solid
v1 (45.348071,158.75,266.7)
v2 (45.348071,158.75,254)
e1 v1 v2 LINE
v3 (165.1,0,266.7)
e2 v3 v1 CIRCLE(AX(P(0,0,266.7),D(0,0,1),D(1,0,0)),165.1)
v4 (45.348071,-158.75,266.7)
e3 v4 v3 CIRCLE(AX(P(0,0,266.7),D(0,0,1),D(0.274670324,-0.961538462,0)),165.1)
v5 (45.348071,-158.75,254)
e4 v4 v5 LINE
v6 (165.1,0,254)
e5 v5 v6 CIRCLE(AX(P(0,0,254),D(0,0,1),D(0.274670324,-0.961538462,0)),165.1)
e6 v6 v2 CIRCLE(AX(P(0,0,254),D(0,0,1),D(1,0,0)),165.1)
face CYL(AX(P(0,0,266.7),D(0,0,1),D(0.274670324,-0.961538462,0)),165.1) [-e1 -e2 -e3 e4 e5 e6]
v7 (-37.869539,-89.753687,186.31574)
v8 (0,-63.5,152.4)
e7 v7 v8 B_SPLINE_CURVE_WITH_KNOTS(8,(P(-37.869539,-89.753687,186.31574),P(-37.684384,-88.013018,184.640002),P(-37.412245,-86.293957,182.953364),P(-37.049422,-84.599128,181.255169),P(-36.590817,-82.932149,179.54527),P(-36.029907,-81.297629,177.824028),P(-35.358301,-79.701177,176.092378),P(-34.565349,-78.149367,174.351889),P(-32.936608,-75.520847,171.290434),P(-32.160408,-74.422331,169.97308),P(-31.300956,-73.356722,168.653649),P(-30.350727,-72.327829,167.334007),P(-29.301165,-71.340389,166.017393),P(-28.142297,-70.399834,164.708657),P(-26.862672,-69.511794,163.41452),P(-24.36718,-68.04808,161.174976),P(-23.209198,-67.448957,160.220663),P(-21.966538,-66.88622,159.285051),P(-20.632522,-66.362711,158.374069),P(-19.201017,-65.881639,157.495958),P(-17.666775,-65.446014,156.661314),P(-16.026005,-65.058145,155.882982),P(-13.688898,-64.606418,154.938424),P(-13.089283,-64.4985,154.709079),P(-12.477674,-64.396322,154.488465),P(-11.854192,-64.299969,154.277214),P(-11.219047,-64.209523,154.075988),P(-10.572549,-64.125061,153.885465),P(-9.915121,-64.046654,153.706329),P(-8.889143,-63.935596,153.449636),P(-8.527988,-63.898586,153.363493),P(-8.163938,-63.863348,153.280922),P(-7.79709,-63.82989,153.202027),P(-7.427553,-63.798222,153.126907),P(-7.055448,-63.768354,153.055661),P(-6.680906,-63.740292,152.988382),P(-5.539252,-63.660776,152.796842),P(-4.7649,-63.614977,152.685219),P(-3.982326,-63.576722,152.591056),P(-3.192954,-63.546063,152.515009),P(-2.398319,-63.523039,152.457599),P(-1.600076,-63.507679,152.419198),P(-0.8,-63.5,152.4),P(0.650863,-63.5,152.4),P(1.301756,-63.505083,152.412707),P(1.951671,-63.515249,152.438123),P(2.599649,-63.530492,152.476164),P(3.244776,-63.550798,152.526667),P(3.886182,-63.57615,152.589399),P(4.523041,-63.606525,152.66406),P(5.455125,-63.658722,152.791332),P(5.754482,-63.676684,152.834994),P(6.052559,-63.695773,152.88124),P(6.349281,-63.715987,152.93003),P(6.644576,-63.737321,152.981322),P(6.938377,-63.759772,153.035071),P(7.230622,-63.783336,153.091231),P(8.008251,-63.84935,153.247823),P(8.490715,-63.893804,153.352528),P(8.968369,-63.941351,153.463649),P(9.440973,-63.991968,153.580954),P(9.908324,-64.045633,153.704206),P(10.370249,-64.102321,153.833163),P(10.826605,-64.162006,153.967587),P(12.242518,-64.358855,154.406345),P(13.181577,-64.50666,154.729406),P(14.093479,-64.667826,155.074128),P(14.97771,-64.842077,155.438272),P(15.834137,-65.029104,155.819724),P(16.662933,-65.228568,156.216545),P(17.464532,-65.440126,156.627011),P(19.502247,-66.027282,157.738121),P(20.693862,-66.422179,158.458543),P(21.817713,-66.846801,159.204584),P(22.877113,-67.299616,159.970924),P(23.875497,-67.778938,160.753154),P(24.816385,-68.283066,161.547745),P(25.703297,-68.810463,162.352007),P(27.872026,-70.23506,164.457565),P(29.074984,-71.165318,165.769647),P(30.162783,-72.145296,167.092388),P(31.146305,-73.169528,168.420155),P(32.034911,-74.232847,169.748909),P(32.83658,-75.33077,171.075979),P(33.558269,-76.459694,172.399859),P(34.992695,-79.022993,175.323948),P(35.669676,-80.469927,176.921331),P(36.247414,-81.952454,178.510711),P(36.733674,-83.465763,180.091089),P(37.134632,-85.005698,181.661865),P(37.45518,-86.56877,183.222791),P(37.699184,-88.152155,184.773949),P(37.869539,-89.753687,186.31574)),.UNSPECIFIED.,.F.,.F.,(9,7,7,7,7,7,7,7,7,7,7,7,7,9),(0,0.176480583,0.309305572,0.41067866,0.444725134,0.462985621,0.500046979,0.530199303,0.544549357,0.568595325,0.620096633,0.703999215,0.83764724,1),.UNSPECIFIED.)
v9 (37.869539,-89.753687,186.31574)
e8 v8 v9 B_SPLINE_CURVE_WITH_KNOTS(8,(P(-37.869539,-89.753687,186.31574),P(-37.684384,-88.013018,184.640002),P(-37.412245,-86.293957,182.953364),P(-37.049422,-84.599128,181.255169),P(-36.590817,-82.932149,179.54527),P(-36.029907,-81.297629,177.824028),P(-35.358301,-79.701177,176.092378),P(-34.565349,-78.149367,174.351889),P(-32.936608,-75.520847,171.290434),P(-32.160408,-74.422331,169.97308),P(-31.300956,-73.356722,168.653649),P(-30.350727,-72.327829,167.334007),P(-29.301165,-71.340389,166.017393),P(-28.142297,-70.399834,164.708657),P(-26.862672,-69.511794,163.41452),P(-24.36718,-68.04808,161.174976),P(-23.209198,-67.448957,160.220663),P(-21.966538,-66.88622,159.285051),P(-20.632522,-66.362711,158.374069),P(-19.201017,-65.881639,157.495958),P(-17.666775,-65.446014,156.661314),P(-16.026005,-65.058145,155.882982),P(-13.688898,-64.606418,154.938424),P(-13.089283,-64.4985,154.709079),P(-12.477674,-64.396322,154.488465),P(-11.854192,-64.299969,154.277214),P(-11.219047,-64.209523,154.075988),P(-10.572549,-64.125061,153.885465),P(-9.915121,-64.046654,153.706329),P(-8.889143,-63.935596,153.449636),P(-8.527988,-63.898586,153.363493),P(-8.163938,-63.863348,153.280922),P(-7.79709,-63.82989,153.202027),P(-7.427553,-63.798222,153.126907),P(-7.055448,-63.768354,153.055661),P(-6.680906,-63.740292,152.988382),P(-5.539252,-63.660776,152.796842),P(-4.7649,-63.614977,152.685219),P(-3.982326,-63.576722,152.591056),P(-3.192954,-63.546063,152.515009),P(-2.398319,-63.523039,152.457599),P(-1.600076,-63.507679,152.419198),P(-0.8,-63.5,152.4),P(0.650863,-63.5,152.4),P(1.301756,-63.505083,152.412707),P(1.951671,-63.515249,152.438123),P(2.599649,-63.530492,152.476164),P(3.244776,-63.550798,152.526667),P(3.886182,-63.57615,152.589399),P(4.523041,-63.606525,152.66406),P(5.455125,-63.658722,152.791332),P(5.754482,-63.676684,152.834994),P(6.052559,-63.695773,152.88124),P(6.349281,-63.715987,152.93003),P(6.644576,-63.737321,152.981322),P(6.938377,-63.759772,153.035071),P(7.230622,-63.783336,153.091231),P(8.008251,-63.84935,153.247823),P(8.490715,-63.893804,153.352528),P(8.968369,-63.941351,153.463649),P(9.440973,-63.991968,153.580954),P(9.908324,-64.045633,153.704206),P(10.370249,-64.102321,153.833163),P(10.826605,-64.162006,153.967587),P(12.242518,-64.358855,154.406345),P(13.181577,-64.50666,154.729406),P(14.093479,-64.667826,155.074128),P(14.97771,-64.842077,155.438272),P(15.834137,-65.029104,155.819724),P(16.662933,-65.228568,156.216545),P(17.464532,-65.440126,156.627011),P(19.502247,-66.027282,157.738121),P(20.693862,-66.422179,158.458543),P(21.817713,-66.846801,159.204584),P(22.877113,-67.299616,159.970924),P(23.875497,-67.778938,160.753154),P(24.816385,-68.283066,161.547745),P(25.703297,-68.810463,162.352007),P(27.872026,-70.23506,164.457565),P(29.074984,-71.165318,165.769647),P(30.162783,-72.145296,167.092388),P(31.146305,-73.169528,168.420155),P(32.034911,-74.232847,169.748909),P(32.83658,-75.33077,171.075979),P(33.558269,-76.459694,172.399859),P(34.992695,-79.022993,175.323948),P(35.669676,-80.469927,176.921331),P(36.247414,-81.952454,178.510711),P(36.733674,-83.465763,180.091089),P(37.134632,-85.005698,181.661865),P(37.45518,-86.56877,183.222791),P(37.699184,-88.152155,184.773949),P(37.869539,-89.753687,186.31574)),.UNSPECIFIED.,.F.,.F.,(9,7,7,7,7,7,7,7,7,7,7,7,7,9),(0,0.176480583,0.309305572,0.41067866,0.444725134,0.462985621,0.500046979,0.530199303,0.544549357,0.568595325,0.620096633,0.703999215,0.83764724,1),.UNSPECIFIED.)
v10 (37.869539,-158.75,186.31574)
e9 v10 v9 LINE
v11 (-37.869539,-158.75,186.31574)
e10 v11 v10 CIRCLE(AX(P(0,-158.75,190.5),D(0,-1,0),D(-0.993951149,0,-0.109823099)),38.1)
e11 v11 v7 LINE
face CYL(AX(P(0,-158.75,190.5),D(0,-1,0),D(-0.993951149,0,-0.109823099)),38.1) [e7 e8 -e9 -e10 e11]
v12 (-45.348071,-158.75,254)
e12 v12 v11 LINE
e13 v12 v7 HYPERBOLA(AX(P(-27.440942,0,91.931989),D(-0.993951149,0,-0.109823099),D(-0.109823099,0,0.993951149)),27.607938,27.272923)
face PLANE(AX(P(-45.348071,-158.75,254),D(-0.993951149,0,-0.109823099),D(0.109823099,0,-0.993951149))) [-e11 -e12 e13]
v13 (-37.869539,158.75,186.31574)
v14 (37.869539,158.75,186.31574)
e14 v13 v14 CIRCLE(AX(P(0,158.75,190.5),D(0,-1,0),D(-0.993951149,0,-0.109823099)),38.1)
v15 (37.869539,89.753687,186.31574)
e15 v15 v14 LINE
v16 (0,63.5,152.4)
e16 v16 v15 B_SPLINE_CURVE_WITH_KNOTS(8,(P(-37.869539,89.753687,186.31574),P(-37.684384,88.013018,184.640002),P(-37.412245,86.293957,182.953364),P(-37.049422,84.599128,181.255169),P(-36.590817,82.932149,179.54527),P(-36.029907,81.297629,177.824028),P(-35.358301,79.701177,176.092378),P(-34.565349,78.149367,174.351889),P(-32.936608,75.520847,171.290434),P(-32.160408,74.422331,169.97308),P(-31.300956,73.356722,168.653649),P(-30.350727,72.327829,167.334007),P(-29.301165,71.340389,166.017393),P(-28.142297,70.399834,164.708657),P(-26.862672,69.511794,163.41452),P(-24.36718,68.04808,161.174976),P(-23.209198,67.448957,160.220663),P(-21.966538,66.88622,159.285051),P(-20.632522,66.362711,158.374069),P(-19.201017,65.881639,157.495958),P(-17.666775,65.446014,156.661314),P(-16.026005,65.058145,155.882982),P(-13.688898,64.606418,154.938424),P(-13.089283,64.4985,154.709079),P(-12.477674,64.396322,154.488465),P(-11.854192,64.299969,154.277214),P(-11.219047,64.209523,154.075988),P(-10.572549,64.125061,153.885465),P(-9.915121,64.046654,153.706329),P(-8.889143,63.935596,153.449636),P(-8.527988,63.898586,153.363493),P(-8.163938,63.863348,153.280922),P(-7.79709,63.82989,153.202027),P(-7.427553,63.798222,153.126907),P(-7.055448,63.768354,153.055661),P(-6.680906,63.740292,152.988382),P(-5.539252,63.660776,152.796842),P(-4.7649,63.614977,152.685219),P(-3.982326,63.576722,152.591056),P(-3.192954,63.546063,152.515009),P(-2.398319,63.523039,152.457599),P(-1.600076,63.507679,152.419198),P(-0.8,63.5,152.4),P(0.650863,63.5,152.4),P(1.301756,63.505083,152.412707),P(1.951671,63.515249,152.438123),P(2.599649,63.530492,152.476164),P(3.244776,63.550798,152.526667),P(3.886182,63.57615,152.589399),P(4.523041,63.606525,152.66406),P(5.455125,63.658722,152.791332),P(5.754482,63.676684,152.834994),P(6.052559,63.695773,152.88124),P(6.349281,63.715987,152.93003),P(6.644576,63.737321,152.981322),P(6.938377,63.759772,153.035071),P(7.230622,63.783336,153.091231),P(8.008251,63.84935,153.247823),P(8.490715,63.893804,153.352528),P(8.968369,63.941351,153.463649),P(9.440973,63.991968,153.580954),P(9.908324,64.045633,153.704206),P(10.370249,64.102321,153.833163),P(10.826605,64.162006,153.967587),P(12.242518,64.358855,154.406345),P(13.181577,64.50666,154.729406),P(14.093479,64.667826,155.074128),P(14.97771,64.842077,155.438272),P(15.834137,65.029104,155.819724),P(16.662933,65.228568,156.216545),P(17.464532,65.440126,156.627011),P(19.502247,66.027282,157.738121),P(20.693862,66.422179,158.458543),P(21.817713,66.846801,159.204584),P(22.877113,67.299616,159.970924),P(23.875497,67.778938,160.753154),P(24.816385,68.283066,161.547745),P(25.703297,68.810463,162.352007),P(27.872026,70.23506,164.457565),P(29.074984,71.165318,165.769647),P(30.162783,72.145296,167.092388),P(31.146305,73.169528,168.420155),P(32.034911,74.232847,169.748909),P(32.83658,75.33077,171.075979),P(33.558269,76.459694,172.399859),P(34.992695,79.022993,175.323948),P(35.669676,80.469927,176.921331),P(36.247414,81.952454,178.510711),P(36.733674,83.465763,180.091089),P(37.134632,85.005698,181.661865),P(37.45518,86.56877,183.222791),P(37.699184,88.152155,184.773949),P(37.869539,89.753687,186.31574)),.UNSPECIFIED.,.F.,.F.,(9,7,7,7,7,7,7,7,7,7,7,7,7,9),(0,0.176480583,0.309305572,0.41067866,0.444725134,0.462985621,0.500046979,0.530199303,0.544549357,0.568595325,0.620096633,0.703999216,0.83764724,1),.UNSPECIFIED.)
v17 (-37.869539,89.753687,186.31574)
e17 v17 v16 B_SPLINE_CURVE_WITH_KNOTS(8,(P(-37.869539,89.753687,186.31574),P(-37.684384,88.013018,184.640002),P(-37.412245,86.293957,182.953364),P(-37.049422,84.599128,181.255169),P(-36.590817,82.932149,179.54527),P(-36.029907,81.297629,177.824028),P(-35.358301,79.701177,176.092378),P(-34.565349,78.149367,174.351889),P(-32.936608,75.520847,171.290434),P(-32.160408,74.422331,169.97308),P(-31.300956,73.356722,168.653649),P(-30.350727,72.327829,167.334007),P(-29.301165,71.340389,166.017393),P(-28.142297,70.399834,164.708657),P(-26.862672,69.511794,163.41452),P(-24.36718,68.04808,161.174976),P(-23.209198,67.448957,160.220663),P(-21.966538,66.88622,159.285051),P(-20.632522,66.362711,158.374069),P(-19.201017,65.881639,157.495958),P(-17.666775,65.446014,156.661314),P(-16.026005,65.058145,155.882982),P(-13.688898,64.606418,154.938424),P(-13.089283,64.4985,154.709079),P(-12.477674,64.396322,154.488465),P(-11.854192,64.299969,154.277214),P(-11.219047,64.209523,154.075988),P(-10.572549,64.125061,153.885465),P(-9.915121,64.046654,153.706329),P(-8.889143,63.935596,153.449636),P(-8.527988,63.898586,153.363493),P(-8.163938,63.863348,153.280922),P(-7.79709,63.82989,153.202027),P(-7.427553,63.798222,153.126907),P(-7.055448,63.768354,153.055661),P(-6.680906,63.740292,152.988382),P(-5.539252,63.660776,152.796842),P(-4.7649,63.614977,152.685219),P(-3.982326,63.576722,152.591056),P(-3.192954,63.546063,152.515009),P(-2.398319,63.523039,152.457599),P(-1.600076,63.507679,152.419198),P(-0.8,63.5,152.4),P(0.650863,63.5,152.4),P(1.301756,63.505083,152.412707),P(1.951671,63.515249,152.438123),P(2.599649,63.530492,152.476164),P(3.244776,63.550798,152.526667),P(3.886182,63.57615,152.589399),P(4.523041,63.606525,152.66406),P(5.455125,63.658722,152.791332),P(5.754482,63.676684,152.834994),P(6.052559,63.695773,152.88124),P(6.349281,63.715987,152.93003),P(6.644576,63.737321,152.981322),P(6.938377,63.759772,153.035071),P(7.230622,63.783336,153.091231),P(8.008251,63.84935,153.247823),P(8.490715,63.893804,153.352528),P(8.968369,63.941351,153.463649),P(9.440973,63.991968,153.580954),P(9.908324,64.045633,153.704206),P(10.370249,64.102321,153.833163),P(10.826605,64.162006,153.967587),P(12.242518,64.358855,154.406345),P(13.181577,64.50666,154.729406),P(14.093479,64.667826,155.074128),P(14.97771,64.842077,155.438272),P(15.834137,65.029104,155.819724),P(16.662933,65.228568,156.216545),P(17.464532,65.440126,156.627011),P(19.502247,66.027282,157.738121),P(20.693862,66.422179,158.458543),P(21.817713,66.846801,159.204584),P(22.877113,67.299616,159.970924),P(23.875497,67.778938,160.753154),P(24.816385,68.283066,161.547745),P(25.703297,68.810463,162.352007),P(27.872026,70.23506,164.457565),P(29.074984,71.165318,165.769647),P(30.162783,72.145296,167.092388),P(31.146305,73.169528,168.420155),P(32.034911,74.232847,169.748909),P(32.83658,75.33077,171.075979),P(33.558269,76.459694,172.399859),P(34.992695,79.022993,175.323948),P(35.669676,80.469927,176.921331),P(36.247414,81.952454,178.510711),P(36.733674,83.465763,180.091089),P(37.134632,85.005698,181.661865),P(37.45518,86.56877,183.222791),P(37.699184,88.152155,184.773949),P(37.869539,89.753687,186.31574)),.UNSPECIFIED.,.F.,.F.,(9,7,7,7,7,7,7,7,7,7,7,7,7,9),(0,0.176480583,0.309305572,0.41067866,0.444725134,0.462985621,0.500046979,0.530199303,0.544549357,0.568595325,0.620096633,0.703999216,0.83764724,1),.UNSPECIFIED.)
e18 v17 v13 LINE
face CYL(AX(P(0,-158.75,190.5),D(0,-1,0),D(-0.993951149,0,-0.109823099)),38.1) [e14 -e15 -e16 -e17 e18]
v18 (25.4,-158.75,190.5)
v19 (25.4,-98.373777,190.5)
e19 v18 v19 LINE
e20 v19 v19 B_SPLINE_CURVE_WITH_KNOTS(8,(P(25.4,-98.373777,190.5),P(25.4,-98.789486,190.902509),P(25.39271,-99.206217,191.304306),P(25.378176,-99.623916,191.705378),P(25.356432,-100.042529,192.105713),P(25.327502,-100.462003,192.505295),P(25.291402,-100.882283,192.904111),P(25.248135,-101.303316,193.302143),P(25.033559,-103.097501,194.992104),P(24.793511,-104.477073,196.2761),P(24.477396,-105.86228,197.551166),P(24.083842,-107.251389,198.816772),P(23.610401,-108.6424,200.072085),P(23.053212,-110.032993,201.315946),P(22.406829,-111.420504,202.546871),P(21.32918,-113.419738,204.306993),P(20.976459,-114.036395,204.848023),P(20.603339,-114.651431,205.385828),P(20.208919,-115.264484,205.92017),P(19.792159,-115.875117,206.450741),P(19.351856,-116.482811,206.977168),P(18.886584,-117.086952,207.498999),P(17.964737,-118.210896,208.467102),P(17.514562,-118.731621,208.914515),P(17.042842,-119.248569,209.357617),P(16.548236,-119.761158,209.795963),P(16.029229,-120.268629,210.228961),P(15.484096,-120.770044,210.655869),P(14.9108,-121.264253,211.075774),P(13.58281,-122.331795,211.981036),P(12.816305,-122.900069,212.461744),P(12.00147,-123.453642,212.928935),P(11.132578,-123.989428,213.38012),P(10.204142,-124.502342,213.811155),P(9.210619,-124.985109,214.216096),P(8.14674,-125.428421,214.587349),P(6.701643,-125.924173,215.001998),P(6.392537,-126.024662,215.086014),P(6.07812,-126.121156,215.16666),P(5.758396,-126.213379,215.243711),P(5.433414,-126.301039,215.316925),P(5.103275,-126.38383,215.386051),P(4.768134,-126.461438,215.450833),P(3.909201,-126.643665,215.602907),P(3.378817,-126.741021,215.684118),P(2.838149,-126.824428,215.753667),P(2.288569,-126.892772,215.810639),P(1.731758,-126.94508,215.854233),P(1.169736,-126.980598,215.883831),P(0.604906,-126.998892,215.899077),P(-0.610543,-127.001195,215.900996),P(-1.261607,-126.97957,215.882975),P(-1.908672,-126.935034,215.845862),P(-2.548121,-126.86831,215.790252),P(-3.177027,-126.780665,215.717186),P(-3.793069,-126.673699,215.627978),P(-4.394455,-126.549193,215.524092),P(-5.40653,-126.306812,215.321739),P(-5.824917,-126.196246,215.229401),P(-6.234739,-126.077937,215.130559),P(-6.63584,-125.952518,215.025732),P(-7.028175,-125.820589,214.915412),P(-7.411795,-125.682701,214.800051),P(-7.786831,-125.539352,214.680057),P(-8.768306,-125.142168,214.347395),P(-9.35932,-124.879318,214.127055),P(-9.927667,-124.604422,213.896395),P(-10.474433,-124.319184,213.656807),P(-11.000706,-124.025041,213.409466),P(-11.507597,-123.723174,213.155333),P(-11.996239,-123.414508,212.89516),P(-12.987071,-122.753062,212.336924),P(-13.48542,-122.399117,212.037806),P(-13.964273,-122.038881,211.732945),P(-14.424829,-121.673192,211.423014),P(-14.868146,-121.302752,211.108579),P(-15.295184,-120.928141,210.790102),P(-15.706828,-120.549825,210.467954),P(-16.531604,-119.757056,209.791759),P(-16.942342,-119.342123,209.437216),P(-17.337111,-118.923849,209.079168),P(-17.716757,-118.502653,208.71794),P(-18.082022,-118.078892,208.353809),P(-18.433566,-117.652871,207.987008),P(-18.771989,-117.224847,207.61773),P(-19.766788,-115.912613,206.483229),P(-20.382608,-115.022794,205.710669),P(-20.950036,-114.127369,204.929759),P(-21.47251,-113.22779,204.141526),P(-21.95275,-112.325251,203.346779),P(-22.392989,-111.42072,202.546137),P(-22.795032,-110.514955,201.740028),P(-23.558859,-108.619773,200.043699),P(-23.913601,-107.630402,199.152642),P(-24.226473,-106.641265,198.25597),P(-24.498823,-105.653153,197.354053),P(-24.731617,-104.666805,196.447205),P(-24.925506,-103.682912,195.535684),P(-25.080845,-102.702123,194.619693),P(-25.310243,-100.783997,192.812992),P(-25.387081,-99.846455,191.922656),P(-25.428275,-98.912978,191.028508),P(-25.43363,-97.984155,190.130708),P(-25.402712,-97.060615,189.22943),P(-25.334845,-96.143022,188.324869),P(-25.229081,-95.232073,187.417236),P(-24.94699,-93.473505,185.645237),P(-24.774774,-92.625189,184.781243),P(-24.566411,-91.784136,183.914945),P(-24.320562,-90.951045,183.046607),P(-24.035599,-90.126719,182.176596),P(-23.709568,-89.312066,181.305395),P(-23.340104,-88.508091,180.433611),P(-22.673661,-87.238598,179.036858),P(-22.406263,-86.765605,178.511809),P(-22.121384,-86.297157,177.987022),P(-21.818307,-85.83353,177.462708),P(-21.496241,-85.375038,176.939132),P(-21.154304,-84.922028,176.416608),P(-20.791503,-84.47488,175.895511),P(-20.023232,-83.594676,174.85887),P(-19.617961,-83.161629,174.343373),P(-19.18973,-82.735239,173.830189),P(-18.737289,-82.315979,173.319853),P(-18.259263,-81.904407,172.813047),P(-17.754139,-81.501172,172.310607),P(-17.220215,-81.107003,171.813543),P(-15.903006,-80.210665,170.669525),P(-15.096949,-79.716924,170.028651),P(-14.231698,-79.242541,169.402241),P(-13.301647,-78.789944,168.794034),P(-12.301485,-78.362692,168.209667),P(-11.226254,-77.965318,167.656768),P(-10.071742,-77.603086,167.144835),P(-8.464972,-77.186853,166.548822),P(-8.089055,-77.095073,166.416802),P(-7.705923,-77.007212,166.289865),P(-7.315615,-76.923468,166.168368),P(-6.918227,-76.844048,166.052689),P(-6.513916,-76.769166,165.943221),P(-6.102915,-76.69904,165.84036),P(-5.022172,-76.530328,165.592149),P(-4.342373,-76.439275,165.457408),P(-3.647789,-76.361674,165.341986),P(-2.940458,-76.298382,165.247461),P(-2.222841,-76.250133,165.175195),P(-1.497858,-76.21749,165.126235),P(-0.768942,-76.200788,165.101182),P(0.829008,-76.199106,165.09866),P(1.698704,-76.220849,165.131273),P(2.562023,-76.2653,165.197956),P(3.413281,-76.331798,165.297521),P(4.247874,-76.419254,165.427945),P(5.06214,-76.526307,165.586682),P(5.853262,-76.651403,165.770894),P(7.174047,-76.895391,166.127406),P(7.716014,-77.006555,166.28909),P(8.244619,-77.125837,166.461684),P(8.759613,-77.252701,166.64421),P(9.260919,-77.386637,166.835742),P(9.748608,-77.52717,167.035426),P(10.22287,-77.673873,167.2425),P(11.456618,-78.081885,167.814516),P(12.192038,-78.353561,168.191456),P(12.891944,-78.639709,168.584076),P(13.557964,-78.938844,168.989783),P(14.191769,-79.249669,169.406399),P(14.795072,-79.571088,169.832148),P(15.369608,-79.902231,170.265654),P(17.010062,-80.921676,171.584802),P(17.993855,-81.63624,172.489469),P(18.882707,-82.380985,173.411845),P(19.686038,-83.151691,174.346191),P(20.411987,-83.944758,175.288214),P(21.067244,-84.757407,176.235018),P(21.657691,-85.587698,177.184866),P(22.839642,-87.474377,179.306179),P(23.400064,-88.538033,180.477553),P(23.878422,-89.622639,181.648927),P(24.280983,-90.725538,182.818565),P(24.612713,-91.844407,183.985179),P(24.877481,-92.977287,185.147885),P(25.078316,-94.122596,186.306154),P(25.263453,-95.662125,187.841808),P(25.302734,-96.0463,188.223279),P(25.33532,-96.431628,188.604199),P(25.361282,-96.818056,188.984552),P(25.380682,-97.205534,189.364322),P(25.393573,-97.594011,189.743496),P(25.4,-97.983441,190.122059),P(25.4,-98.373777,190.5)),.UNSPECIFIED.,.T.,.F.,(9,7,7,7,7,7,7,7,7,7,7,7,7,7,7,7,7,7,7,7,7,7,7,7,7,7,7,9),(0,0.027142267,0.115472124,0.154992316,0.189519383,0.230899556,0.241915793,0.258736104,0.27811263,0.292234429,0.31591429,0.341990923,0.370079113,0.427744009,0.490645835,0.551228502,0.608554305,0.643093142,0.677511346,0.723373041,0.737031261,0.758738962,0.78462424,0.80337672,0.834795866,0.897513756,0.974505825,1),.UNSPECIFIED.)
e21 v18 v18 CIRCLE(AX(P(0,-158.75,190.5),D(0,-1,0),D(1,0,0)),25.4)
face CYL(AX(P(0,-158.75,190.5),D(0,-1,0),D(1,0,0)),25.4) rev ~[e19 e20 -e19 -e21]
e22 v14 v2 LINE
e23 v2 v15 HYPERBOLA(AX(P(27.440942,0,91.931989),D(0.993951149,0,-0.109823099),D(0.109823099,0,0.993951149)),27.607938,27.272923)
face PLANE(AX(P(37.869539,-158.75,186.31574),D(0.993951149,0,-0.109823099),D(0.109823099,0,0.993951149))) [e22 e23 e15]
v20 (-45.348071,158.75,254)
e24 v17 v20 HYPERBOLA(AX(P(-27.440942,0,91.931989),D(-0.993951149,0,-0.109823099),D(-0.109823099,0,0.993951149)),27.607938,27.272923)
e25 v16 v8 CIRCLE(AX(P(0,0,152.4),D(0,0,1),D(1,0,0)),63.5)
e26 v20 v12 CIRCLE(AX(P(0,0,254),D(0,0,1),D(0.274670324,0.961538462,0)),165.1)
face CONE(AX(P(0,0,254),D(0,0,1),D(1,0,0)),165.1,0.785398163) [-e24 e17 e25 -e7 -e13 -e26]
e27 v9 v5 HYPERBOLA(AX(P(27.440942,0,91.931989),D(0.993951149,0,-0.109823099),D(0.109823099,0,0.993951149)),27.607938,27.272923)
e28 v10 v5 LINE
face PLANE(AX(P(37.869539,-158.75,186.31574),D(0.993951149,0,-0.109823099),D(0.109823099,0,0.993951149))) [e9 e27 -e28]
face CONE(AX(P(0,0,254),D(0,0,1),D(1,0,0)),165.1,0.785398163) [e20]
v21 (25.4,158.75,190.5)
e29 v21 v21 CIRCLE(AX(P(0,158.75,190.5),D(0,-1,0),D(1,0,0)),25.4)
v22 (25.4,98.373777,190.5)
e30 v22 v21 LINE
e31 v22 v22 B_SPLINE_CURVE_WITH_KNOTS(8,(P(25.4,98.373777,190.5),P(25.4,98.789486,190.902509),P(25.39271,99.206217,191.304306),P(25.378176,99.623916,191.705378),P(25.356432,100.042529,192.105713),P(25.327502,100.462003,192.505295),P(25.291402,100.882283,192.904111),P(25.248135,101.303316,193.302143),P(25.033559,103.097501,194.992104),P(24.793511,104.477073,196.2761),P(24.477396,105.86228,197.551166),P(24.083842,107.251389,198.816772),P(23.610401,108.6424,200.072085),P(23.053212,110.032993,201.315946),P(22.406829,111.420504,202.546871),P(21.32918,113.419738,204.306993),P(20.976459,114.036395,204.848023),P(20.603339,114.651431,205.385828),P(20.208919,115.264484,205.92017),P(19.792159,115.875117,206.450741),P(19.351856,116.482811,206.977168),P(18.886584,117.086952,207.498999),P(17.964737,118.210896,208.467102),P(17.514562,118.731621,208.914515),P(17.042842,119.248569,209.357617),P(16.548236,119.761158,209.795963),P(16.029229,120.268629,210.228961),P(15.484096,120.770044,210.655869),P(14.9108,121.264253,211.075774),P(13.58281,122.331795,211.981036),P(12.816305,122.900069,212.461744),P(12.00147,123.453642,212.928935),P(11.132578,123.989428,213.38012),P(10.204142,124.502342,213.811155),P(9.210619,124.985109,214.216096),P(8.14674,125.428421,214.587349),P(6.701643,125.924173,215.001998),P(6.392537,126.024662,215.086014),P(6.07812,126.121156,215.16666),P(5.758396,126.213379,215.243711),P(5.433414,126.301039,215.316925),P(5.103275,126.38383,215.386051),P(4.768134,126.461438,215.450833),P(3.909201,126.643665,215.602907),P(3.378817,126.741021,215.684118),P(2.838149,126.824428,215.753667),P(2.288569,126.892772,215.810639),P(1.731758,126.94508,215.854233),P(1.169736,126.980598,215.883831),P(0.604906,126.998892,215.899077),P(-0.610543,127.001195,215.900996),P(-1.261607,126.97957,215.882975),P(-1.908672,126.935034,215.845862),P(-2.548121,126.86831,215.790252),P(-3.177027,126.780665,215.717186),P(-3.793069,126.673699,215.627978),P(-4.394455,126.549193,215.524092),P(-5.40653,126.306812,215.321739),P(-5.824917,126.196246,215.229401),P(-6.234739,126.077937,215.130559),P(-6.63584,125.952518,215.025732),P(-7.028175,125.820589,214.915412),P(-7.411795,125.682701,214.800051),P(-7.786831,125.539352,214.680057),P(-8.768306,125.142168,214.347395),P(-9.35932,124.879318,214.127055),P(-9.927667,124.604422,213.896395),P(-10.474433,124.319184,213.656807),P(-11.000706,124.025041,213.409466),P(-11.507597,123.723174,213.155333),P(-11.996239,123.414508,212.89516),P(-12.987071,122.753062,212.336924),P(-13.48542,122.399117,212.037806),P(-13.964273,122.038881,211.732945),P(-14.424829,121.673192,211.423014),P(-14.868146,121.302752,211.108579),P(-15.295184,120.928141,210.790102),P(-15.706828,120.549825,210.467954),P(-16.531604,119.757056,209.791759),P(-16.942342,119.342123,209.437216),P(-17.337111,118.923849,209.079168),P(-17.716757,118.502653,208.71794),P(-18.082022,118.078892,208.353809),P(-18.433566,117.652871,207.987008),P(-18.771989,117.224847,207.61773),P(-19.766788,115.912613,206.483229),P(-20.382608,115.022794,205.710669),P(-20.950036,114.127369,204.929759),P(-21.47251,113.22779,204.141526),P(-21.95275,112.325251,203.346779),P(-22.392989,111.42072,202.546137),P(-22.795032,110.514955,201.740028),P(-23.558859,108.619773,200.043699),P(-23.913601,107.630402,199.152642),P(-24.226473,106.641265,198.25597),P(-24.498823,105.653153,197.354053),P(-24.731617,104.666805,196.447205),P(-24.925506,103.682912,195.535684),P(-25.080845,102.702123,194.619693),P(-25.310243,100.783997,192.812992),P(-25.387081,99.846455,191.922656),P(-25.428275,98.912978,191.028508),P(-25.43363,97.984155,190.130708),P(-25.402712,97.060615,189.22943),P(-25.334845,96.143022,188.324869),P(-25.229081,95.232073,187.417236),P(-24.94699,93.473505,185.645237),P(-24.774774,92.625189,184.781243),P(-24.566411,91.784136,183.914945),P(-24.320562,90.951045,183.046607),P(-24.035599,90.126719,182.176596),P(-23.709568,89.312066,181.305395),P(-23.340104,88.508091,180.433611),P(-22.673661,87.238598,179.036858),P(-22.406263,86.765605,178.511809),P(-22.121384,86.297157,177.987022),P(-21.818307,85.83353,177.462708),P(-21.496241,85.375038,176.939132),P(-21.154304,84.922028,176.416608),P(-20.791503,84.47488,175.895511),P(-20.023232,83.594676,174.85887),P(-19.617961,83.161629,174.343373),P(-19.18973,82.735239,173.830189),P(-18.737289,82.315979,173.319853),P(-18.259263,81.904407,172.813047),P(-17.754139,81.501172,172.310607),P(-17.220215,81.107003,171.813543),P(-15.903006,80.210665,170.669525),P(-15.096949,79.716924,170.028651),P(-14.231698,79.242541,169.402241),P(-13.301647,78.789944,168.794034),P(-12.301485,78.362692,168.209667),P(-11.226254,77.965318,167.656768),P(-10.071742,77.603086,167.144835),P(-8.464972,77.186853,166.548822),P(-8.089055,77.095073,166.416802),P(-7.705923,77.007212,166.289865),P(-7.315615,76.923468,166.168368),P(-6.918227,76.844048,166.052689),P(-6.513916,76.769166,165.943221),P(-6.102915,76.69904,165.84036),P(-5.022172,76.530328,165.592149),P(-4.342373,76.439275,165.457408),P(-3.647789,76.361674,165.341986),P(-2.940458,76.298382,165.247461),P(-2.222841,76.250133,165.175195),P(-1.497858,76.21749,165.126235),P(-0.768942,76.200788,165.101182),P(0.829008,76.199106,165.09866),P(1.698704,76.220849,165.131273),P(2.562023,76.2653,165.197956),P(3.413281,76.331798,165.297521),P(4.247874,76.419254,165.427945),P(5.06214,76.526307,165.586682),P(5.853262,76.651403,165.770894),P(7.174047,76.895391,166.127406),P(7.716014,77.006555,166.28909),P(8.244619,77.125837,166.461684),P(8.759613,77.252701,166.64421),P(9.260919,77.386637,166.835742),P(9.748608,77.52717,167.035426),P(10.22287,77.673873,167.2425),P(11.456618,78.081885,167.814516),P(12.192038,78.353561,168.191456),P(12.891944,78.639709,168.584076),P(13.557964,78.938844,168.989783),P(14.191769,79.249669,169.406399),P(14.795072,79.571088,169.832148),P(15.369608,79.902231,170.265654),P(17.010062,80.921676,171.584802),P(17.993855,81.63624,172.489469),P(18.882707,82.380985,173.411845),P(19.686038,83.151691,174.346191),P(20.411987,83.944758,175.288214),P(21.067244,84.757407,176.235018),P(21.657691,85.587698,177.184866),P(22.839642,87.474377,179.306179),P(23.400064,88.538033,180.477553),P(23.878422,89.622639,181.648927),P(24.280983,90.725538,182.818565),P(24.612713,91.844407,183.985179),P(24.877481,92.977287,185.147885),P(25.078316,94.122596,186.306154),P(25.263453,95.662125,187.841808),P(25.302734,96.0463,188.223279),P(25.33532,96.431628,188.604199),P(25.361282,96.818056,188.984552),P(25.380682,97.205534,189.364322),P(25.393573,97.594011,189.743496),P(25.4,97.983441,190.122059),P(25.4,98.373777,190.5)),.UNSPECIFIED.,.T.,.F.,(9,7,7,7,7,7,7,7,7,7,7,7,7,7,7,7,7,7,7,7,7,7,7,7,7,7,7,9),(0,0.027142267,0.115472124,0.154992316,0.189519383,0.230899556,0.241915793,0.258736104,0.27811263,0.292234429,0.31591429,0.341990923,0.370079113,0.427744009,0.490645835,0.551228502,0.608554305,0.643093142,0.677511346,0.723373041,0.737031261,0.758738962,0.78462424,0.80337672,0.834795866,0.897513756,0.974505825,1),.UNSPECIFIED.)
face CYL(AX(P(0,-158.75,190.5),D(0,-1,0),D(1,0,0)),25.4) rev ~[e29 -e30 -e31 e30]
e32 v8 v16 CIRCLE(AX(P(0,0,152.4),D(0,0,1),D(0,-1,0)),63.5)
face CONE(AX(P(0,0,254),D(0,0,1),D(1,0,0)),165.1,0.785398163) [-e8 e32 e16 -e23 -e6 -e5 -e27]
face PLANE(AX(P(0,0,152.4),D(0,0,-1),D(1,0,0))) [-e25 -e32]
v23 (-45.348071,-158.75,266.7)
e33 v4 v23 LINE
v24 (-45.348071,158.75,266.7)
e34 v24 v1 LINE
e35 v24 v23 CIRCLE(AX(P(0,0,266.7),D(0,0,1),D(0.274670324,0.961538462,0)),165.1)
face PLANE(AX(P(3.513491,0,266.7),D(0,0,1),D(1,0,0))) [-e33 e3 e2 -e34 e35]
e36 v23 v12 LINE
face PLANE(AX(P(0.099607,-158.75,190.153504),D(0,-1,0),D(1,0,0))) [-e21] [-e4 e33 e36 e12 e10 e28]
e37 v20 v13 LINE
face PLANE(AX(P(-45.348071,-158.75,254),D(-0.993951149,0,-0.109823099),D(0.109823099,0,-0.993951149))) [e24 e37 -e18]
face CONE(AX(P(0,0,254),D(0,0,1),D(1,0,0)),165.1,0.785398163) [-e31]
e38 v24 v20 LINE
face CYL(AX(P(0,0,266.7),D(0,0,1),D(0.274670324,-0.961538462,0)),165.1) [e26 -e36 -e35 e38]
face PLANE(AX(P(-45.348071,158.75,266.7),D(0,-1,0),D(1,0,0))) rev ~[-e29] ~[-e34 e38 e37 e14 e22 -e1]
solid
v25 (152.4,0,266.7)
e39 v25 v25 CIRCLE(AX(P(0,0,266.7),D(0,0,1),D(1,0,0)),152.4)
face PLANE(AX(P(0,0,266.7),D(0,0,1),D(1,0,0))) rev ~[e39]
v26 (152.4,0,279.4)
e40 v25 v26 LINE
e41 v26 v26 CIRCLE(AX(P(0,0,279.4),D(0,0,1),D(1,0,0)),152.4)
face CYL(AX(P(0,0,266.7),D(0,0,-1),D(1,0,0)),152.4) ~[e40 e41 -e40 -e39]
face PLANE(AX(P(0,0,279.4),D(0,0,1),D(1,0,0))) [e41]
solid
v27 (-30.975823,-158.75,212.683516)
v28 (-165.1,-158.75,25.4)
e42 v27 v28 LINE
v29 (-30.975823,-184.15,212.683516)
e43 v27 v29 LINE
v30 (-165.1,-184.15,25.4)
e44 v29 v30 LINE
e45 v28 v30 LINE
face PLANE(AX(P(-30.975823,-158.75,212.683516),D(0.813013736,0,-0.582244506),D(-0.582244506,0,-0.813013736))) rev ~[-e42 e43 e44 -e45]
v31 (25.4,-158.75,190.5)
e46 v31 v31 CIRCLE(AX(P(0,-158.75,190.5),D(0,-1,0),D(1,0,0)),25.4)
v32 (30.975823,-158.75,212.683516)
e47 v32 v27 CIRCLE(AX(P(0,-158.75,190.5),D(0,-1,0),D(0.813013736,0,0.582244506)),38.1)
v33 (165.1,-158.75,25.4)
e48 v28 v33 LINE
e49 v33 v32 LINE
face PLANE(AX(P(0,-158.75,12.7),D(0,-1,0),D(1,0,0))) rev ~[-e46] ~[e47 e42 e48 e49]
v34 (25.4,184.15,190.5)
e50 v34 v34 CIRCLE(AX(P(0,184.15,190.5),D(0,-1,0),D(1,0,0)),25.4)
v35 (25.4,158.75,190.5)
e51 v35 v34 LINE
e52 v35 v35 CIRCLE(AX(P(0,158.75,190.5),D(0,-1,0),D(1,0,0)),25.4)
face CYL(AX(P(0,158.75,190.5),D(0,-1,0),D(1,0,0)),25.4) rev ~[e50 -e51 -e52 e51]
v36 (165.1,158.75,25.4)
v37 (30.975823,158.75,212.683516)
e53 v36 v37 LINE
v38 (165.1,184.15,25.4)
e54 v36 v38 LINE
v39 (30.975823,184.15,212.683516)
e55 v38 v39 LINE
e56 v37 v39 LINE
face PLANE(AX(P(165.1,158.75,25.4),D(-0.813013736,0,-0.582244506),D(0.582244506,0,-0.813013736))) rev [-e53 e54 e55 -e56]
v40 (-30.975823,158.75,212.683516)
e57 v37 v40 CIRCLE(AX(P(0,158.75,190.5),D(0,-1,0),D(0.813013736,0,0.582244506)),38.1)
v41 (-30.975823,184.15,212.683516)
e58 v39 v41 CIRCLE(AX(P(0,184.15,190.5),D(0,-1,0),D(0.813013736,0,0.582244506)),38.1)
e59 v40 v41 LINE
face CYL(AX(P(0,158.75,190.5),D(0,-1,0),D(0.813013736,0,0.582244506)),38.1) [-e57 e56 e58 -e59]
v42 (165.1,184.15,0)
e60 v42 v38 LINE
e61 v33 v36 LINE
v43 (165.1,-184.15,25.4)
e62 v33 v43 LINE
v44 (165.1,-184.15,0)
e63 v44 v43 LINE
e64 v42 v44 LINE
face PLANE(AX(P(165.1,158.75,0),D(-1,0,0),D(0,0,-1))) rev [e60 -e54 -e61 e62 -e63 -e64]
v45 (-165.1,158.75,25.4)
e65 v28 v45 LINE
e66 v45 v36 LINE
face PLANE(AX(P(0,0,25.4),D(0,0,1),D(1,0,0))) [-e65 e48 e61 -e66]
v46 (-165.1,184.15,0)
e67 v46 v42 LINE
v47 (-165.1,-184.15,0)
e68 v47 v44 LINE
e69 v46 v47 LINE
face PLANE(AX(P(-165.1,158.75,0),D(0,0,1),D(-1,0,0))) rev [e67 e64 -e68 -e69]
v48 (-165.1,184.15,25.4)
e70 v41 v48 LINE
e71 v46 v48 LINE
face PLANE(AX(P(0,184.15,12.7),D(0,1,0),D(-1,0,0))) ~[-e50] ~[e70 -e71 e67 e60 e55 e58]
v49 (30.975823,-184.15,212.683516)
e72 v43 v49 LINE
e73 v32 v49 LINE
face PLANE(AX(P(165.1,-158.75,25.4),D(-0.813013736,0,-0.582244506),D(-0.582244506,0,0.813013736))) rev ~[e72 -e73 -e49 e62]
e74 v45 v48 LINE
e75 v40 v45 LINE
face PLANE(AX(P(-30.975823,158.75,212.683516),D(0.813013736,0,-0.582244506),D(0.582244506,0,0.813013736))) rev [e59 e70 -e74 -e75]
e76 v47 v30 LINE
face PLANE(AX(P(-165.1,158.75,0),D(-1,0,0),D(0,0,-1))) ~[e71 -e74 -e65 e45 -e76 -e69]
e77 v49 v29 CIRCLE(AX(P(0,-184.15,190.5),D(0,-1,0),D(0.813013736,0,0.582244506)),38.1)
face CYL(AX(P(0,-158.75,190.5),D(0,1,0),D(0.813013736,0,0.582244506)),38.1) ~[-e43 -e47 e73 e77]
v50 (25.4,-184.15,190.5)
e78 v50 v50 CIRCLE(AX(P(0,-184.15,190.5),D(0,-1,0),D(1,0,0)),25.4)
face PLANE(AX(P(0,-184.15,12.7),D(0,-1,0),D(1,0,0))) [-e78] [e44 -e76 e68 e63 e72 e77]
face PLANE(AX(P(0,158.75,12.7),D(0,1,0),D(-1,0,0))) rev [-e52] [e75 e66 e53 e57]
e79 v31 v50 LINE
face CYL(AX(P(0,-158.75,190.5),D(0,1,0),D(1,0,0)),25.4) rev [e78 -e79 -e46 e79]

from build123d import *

# Parameters (mm, degrees)
F0_W      = 330.2
F0_H      = 317.5
F1_DEPTH  = 25.4
F2_W      = 330.2
F2_H      = 25.4
F2_R      = 25.4
F3_DEPTH  = 25.4
F7_DEPTH  = 12.7
F7_FACE_R = 165.1
F8_DEPTH  = 101.6
F8_TAPER  = 45
F9_DEPTH  = 266.701
F10_R     = 25.4
F11_DEPTH = 317.5
F12_R     = 152.4
F13_DEPTH = 12.7


with BuildPart() as f1:
    # F0 (on Top) → F1 (new body)
    with BuildSketch(Plane.XY):
        Rectangle(F0_W, F0_H)
    extrude(amount=F1_DEPTH)

    # F2 (on face) → F3 (join)
    with BuildSketch(Plane.XZ.offset(158.75)):
        with Locations((0, 12.7)):
            Rectangle(F2_W, F2_H)
        with BuildLine():
            Line((-30.975823358, 212.6835156657), (-165.1, 25.4))
            Line((-165.1, 25.4), (165.1, 25.4))
            Line((165.1, 25.4), (30.975823358, 212.6835156657))
            ThreePointArc((30.975823358, 212.6835156657), (36.2752592681, 202.149702358), (38.1, 190.5))
            ThreePointArc((38.1, 190.5), (-11.649702358, 154.2247407319), (-30.975823358, 212.6835156657))
        make_face()
        with BuildLine():
            ThreePointArc((30.975823358, 212.6835156657), (0, 228.6), (-30.975823358, 212.6835156657))
            ThreePointArc((-30.975823358, 212.6835156657), (-11.649702358, 154.2247407319), (38.1, 190.5))
            ThreePointArc((38.1, 190.5), (36.2752592681, 202.149702358), (30.975823358, 212.6835156657))
        make_face()
        with Locations((0, 190.5)):
            Circle(F2_R, mode=Mode.SUBTRACT)
    extrude(amount=F3_DEPTH)

    # F4: F1 across plane


with BuildPart() as f1_1:
    add(f1.part)
    add(f1.part.mirror(Plane.XZ))


with BuildPart() as f7:
    # F6 (on offset) → F7 (new body)
    with BuildSketch(Plane.XY.offset(266.7)):
        with BuildLine():
            ThreePointArc((45.3480705212, -158.75), (131.8047352015, -99.4259612902), (165.1, 0))
            ThreePointArc((165.1, 0), (131.8047352015, 99.4259612902), (45.3480705212, 158.75))
            Line((45.3480705212, 158.75), (-45.3480705212, 158.75))
            ThreePointArc((-45.3480705212, 158.75), (-165.1, 0), (-45.3480705212, -158.75))
            Line((-45.3480705212, -158.75), (45.3480705212, -158.75))
        make_face()
        with BuildLine():
            ThreePointArc((-45.3480705212, -158.75), (0, -165.1), (45.3480705212, -158.75))
            Line((45.3480705212, -158.75), (-45.3480705212, -158.75))
        make_face()
        with BuildLine():
            Line((-45.3480705212, 158.75), (45.3480705212, 158.75))
            ThreePointArc((45.3480705212, 158.75), (0, 165.1), (-45.3480705212, 158.75))
        make_face()
    extrude(amount=-F7_DEPTH)

    # F7_face (on face) → F8 (join)
    with BuildSketch(Plane(origin=(0, 0, 254), x_dir=(1, 0, 0), z_dir=(0, 0, -1))):
        Circle(F7_FACE_R)
    extrude(amount=F8_DEPTH, taper=F8_TAPER)

    # F6 (on offset) → F9 (cut, through all)
    with BuildSketch(Plane.XY.offset(266.7)):
        with BuildLine():
            Line((-45.3480705212, 158.75), (45.3480705212, 158.75))
            ThreePointArc((45.3480705212, 158.75), (0, 165.1), (-45.3480705212, 158.75))
        make_face()
        with BuildLine():
            ThreePointArc((-45.3480705212, -158.75), (0, -165.1), (45.3480705212, -158.75))
            Line((45.3480705212, -158.75), (-45.3480705212, -158.75))
        make_face()
    extrude(amount=-F9_DEPTH, mode=Mode.SUBTRACT)

    # F10 (on face) → F11 (join, through all)
    with BuildSketch(Plane.XZ.offset(158.75)):
        with BuildLine():
            ThreePointArc((38.1, 190.5), (-2.0953009818, 228.5423410662), (-37.8695387819, 186.3157399167))
            ThreePointArc((-37.8695387819, 186.3157399167), (0, 152.4), (37.8695387819, 186.3157399167))
            ThreePointArc((37.8695387819, 186.3157399167), (38.0423410662, 188.4046990182), (38.1, 190.5))
        make_face()
        with Locations((0, 190.5)):
            Circle(F10_R, mode=Mode.SUBTRACT)
        with BuildLine():
            add(Edge.make_bspline(
                [(-45.3480705212, 254), (0, 241.5442307692), (45.3480705212, 254)],
                knots=[-0.2819082891, -0.2819082891, -0.2819082891, 0.2819082891, 0.2819082891, 0.2819082891], degree=2, weights=[1, 1.04, 1]))
            Line((-45.3480705212, 254), (-37.8695387819, 186.3157399167))
            ThreePointArc((-37.8695387819, 186.3157399167), (-2.0953009818, 228.5423410662), (38.1, 190.5))
            ThreePointArc((38.1, 190.5), (38.0423410662, 188.4046990182), (37.8695387819, 186.3157399167))
            Line((37.8695387819, 186.3157399167), (45.3480705212, 254))
        make_face()
    extrude(amount=-F11_DEPTH)


with BuildPart() as f13:
    # F12 (on face) → F13 (new body)
    with BuildSketch(Plane.XY.offset(266.7)):
        Circle(F12_R)
    extrude(amount=F13_DEPTH)


solid = Compound([f1_1.part, f7.part, f13.part])
